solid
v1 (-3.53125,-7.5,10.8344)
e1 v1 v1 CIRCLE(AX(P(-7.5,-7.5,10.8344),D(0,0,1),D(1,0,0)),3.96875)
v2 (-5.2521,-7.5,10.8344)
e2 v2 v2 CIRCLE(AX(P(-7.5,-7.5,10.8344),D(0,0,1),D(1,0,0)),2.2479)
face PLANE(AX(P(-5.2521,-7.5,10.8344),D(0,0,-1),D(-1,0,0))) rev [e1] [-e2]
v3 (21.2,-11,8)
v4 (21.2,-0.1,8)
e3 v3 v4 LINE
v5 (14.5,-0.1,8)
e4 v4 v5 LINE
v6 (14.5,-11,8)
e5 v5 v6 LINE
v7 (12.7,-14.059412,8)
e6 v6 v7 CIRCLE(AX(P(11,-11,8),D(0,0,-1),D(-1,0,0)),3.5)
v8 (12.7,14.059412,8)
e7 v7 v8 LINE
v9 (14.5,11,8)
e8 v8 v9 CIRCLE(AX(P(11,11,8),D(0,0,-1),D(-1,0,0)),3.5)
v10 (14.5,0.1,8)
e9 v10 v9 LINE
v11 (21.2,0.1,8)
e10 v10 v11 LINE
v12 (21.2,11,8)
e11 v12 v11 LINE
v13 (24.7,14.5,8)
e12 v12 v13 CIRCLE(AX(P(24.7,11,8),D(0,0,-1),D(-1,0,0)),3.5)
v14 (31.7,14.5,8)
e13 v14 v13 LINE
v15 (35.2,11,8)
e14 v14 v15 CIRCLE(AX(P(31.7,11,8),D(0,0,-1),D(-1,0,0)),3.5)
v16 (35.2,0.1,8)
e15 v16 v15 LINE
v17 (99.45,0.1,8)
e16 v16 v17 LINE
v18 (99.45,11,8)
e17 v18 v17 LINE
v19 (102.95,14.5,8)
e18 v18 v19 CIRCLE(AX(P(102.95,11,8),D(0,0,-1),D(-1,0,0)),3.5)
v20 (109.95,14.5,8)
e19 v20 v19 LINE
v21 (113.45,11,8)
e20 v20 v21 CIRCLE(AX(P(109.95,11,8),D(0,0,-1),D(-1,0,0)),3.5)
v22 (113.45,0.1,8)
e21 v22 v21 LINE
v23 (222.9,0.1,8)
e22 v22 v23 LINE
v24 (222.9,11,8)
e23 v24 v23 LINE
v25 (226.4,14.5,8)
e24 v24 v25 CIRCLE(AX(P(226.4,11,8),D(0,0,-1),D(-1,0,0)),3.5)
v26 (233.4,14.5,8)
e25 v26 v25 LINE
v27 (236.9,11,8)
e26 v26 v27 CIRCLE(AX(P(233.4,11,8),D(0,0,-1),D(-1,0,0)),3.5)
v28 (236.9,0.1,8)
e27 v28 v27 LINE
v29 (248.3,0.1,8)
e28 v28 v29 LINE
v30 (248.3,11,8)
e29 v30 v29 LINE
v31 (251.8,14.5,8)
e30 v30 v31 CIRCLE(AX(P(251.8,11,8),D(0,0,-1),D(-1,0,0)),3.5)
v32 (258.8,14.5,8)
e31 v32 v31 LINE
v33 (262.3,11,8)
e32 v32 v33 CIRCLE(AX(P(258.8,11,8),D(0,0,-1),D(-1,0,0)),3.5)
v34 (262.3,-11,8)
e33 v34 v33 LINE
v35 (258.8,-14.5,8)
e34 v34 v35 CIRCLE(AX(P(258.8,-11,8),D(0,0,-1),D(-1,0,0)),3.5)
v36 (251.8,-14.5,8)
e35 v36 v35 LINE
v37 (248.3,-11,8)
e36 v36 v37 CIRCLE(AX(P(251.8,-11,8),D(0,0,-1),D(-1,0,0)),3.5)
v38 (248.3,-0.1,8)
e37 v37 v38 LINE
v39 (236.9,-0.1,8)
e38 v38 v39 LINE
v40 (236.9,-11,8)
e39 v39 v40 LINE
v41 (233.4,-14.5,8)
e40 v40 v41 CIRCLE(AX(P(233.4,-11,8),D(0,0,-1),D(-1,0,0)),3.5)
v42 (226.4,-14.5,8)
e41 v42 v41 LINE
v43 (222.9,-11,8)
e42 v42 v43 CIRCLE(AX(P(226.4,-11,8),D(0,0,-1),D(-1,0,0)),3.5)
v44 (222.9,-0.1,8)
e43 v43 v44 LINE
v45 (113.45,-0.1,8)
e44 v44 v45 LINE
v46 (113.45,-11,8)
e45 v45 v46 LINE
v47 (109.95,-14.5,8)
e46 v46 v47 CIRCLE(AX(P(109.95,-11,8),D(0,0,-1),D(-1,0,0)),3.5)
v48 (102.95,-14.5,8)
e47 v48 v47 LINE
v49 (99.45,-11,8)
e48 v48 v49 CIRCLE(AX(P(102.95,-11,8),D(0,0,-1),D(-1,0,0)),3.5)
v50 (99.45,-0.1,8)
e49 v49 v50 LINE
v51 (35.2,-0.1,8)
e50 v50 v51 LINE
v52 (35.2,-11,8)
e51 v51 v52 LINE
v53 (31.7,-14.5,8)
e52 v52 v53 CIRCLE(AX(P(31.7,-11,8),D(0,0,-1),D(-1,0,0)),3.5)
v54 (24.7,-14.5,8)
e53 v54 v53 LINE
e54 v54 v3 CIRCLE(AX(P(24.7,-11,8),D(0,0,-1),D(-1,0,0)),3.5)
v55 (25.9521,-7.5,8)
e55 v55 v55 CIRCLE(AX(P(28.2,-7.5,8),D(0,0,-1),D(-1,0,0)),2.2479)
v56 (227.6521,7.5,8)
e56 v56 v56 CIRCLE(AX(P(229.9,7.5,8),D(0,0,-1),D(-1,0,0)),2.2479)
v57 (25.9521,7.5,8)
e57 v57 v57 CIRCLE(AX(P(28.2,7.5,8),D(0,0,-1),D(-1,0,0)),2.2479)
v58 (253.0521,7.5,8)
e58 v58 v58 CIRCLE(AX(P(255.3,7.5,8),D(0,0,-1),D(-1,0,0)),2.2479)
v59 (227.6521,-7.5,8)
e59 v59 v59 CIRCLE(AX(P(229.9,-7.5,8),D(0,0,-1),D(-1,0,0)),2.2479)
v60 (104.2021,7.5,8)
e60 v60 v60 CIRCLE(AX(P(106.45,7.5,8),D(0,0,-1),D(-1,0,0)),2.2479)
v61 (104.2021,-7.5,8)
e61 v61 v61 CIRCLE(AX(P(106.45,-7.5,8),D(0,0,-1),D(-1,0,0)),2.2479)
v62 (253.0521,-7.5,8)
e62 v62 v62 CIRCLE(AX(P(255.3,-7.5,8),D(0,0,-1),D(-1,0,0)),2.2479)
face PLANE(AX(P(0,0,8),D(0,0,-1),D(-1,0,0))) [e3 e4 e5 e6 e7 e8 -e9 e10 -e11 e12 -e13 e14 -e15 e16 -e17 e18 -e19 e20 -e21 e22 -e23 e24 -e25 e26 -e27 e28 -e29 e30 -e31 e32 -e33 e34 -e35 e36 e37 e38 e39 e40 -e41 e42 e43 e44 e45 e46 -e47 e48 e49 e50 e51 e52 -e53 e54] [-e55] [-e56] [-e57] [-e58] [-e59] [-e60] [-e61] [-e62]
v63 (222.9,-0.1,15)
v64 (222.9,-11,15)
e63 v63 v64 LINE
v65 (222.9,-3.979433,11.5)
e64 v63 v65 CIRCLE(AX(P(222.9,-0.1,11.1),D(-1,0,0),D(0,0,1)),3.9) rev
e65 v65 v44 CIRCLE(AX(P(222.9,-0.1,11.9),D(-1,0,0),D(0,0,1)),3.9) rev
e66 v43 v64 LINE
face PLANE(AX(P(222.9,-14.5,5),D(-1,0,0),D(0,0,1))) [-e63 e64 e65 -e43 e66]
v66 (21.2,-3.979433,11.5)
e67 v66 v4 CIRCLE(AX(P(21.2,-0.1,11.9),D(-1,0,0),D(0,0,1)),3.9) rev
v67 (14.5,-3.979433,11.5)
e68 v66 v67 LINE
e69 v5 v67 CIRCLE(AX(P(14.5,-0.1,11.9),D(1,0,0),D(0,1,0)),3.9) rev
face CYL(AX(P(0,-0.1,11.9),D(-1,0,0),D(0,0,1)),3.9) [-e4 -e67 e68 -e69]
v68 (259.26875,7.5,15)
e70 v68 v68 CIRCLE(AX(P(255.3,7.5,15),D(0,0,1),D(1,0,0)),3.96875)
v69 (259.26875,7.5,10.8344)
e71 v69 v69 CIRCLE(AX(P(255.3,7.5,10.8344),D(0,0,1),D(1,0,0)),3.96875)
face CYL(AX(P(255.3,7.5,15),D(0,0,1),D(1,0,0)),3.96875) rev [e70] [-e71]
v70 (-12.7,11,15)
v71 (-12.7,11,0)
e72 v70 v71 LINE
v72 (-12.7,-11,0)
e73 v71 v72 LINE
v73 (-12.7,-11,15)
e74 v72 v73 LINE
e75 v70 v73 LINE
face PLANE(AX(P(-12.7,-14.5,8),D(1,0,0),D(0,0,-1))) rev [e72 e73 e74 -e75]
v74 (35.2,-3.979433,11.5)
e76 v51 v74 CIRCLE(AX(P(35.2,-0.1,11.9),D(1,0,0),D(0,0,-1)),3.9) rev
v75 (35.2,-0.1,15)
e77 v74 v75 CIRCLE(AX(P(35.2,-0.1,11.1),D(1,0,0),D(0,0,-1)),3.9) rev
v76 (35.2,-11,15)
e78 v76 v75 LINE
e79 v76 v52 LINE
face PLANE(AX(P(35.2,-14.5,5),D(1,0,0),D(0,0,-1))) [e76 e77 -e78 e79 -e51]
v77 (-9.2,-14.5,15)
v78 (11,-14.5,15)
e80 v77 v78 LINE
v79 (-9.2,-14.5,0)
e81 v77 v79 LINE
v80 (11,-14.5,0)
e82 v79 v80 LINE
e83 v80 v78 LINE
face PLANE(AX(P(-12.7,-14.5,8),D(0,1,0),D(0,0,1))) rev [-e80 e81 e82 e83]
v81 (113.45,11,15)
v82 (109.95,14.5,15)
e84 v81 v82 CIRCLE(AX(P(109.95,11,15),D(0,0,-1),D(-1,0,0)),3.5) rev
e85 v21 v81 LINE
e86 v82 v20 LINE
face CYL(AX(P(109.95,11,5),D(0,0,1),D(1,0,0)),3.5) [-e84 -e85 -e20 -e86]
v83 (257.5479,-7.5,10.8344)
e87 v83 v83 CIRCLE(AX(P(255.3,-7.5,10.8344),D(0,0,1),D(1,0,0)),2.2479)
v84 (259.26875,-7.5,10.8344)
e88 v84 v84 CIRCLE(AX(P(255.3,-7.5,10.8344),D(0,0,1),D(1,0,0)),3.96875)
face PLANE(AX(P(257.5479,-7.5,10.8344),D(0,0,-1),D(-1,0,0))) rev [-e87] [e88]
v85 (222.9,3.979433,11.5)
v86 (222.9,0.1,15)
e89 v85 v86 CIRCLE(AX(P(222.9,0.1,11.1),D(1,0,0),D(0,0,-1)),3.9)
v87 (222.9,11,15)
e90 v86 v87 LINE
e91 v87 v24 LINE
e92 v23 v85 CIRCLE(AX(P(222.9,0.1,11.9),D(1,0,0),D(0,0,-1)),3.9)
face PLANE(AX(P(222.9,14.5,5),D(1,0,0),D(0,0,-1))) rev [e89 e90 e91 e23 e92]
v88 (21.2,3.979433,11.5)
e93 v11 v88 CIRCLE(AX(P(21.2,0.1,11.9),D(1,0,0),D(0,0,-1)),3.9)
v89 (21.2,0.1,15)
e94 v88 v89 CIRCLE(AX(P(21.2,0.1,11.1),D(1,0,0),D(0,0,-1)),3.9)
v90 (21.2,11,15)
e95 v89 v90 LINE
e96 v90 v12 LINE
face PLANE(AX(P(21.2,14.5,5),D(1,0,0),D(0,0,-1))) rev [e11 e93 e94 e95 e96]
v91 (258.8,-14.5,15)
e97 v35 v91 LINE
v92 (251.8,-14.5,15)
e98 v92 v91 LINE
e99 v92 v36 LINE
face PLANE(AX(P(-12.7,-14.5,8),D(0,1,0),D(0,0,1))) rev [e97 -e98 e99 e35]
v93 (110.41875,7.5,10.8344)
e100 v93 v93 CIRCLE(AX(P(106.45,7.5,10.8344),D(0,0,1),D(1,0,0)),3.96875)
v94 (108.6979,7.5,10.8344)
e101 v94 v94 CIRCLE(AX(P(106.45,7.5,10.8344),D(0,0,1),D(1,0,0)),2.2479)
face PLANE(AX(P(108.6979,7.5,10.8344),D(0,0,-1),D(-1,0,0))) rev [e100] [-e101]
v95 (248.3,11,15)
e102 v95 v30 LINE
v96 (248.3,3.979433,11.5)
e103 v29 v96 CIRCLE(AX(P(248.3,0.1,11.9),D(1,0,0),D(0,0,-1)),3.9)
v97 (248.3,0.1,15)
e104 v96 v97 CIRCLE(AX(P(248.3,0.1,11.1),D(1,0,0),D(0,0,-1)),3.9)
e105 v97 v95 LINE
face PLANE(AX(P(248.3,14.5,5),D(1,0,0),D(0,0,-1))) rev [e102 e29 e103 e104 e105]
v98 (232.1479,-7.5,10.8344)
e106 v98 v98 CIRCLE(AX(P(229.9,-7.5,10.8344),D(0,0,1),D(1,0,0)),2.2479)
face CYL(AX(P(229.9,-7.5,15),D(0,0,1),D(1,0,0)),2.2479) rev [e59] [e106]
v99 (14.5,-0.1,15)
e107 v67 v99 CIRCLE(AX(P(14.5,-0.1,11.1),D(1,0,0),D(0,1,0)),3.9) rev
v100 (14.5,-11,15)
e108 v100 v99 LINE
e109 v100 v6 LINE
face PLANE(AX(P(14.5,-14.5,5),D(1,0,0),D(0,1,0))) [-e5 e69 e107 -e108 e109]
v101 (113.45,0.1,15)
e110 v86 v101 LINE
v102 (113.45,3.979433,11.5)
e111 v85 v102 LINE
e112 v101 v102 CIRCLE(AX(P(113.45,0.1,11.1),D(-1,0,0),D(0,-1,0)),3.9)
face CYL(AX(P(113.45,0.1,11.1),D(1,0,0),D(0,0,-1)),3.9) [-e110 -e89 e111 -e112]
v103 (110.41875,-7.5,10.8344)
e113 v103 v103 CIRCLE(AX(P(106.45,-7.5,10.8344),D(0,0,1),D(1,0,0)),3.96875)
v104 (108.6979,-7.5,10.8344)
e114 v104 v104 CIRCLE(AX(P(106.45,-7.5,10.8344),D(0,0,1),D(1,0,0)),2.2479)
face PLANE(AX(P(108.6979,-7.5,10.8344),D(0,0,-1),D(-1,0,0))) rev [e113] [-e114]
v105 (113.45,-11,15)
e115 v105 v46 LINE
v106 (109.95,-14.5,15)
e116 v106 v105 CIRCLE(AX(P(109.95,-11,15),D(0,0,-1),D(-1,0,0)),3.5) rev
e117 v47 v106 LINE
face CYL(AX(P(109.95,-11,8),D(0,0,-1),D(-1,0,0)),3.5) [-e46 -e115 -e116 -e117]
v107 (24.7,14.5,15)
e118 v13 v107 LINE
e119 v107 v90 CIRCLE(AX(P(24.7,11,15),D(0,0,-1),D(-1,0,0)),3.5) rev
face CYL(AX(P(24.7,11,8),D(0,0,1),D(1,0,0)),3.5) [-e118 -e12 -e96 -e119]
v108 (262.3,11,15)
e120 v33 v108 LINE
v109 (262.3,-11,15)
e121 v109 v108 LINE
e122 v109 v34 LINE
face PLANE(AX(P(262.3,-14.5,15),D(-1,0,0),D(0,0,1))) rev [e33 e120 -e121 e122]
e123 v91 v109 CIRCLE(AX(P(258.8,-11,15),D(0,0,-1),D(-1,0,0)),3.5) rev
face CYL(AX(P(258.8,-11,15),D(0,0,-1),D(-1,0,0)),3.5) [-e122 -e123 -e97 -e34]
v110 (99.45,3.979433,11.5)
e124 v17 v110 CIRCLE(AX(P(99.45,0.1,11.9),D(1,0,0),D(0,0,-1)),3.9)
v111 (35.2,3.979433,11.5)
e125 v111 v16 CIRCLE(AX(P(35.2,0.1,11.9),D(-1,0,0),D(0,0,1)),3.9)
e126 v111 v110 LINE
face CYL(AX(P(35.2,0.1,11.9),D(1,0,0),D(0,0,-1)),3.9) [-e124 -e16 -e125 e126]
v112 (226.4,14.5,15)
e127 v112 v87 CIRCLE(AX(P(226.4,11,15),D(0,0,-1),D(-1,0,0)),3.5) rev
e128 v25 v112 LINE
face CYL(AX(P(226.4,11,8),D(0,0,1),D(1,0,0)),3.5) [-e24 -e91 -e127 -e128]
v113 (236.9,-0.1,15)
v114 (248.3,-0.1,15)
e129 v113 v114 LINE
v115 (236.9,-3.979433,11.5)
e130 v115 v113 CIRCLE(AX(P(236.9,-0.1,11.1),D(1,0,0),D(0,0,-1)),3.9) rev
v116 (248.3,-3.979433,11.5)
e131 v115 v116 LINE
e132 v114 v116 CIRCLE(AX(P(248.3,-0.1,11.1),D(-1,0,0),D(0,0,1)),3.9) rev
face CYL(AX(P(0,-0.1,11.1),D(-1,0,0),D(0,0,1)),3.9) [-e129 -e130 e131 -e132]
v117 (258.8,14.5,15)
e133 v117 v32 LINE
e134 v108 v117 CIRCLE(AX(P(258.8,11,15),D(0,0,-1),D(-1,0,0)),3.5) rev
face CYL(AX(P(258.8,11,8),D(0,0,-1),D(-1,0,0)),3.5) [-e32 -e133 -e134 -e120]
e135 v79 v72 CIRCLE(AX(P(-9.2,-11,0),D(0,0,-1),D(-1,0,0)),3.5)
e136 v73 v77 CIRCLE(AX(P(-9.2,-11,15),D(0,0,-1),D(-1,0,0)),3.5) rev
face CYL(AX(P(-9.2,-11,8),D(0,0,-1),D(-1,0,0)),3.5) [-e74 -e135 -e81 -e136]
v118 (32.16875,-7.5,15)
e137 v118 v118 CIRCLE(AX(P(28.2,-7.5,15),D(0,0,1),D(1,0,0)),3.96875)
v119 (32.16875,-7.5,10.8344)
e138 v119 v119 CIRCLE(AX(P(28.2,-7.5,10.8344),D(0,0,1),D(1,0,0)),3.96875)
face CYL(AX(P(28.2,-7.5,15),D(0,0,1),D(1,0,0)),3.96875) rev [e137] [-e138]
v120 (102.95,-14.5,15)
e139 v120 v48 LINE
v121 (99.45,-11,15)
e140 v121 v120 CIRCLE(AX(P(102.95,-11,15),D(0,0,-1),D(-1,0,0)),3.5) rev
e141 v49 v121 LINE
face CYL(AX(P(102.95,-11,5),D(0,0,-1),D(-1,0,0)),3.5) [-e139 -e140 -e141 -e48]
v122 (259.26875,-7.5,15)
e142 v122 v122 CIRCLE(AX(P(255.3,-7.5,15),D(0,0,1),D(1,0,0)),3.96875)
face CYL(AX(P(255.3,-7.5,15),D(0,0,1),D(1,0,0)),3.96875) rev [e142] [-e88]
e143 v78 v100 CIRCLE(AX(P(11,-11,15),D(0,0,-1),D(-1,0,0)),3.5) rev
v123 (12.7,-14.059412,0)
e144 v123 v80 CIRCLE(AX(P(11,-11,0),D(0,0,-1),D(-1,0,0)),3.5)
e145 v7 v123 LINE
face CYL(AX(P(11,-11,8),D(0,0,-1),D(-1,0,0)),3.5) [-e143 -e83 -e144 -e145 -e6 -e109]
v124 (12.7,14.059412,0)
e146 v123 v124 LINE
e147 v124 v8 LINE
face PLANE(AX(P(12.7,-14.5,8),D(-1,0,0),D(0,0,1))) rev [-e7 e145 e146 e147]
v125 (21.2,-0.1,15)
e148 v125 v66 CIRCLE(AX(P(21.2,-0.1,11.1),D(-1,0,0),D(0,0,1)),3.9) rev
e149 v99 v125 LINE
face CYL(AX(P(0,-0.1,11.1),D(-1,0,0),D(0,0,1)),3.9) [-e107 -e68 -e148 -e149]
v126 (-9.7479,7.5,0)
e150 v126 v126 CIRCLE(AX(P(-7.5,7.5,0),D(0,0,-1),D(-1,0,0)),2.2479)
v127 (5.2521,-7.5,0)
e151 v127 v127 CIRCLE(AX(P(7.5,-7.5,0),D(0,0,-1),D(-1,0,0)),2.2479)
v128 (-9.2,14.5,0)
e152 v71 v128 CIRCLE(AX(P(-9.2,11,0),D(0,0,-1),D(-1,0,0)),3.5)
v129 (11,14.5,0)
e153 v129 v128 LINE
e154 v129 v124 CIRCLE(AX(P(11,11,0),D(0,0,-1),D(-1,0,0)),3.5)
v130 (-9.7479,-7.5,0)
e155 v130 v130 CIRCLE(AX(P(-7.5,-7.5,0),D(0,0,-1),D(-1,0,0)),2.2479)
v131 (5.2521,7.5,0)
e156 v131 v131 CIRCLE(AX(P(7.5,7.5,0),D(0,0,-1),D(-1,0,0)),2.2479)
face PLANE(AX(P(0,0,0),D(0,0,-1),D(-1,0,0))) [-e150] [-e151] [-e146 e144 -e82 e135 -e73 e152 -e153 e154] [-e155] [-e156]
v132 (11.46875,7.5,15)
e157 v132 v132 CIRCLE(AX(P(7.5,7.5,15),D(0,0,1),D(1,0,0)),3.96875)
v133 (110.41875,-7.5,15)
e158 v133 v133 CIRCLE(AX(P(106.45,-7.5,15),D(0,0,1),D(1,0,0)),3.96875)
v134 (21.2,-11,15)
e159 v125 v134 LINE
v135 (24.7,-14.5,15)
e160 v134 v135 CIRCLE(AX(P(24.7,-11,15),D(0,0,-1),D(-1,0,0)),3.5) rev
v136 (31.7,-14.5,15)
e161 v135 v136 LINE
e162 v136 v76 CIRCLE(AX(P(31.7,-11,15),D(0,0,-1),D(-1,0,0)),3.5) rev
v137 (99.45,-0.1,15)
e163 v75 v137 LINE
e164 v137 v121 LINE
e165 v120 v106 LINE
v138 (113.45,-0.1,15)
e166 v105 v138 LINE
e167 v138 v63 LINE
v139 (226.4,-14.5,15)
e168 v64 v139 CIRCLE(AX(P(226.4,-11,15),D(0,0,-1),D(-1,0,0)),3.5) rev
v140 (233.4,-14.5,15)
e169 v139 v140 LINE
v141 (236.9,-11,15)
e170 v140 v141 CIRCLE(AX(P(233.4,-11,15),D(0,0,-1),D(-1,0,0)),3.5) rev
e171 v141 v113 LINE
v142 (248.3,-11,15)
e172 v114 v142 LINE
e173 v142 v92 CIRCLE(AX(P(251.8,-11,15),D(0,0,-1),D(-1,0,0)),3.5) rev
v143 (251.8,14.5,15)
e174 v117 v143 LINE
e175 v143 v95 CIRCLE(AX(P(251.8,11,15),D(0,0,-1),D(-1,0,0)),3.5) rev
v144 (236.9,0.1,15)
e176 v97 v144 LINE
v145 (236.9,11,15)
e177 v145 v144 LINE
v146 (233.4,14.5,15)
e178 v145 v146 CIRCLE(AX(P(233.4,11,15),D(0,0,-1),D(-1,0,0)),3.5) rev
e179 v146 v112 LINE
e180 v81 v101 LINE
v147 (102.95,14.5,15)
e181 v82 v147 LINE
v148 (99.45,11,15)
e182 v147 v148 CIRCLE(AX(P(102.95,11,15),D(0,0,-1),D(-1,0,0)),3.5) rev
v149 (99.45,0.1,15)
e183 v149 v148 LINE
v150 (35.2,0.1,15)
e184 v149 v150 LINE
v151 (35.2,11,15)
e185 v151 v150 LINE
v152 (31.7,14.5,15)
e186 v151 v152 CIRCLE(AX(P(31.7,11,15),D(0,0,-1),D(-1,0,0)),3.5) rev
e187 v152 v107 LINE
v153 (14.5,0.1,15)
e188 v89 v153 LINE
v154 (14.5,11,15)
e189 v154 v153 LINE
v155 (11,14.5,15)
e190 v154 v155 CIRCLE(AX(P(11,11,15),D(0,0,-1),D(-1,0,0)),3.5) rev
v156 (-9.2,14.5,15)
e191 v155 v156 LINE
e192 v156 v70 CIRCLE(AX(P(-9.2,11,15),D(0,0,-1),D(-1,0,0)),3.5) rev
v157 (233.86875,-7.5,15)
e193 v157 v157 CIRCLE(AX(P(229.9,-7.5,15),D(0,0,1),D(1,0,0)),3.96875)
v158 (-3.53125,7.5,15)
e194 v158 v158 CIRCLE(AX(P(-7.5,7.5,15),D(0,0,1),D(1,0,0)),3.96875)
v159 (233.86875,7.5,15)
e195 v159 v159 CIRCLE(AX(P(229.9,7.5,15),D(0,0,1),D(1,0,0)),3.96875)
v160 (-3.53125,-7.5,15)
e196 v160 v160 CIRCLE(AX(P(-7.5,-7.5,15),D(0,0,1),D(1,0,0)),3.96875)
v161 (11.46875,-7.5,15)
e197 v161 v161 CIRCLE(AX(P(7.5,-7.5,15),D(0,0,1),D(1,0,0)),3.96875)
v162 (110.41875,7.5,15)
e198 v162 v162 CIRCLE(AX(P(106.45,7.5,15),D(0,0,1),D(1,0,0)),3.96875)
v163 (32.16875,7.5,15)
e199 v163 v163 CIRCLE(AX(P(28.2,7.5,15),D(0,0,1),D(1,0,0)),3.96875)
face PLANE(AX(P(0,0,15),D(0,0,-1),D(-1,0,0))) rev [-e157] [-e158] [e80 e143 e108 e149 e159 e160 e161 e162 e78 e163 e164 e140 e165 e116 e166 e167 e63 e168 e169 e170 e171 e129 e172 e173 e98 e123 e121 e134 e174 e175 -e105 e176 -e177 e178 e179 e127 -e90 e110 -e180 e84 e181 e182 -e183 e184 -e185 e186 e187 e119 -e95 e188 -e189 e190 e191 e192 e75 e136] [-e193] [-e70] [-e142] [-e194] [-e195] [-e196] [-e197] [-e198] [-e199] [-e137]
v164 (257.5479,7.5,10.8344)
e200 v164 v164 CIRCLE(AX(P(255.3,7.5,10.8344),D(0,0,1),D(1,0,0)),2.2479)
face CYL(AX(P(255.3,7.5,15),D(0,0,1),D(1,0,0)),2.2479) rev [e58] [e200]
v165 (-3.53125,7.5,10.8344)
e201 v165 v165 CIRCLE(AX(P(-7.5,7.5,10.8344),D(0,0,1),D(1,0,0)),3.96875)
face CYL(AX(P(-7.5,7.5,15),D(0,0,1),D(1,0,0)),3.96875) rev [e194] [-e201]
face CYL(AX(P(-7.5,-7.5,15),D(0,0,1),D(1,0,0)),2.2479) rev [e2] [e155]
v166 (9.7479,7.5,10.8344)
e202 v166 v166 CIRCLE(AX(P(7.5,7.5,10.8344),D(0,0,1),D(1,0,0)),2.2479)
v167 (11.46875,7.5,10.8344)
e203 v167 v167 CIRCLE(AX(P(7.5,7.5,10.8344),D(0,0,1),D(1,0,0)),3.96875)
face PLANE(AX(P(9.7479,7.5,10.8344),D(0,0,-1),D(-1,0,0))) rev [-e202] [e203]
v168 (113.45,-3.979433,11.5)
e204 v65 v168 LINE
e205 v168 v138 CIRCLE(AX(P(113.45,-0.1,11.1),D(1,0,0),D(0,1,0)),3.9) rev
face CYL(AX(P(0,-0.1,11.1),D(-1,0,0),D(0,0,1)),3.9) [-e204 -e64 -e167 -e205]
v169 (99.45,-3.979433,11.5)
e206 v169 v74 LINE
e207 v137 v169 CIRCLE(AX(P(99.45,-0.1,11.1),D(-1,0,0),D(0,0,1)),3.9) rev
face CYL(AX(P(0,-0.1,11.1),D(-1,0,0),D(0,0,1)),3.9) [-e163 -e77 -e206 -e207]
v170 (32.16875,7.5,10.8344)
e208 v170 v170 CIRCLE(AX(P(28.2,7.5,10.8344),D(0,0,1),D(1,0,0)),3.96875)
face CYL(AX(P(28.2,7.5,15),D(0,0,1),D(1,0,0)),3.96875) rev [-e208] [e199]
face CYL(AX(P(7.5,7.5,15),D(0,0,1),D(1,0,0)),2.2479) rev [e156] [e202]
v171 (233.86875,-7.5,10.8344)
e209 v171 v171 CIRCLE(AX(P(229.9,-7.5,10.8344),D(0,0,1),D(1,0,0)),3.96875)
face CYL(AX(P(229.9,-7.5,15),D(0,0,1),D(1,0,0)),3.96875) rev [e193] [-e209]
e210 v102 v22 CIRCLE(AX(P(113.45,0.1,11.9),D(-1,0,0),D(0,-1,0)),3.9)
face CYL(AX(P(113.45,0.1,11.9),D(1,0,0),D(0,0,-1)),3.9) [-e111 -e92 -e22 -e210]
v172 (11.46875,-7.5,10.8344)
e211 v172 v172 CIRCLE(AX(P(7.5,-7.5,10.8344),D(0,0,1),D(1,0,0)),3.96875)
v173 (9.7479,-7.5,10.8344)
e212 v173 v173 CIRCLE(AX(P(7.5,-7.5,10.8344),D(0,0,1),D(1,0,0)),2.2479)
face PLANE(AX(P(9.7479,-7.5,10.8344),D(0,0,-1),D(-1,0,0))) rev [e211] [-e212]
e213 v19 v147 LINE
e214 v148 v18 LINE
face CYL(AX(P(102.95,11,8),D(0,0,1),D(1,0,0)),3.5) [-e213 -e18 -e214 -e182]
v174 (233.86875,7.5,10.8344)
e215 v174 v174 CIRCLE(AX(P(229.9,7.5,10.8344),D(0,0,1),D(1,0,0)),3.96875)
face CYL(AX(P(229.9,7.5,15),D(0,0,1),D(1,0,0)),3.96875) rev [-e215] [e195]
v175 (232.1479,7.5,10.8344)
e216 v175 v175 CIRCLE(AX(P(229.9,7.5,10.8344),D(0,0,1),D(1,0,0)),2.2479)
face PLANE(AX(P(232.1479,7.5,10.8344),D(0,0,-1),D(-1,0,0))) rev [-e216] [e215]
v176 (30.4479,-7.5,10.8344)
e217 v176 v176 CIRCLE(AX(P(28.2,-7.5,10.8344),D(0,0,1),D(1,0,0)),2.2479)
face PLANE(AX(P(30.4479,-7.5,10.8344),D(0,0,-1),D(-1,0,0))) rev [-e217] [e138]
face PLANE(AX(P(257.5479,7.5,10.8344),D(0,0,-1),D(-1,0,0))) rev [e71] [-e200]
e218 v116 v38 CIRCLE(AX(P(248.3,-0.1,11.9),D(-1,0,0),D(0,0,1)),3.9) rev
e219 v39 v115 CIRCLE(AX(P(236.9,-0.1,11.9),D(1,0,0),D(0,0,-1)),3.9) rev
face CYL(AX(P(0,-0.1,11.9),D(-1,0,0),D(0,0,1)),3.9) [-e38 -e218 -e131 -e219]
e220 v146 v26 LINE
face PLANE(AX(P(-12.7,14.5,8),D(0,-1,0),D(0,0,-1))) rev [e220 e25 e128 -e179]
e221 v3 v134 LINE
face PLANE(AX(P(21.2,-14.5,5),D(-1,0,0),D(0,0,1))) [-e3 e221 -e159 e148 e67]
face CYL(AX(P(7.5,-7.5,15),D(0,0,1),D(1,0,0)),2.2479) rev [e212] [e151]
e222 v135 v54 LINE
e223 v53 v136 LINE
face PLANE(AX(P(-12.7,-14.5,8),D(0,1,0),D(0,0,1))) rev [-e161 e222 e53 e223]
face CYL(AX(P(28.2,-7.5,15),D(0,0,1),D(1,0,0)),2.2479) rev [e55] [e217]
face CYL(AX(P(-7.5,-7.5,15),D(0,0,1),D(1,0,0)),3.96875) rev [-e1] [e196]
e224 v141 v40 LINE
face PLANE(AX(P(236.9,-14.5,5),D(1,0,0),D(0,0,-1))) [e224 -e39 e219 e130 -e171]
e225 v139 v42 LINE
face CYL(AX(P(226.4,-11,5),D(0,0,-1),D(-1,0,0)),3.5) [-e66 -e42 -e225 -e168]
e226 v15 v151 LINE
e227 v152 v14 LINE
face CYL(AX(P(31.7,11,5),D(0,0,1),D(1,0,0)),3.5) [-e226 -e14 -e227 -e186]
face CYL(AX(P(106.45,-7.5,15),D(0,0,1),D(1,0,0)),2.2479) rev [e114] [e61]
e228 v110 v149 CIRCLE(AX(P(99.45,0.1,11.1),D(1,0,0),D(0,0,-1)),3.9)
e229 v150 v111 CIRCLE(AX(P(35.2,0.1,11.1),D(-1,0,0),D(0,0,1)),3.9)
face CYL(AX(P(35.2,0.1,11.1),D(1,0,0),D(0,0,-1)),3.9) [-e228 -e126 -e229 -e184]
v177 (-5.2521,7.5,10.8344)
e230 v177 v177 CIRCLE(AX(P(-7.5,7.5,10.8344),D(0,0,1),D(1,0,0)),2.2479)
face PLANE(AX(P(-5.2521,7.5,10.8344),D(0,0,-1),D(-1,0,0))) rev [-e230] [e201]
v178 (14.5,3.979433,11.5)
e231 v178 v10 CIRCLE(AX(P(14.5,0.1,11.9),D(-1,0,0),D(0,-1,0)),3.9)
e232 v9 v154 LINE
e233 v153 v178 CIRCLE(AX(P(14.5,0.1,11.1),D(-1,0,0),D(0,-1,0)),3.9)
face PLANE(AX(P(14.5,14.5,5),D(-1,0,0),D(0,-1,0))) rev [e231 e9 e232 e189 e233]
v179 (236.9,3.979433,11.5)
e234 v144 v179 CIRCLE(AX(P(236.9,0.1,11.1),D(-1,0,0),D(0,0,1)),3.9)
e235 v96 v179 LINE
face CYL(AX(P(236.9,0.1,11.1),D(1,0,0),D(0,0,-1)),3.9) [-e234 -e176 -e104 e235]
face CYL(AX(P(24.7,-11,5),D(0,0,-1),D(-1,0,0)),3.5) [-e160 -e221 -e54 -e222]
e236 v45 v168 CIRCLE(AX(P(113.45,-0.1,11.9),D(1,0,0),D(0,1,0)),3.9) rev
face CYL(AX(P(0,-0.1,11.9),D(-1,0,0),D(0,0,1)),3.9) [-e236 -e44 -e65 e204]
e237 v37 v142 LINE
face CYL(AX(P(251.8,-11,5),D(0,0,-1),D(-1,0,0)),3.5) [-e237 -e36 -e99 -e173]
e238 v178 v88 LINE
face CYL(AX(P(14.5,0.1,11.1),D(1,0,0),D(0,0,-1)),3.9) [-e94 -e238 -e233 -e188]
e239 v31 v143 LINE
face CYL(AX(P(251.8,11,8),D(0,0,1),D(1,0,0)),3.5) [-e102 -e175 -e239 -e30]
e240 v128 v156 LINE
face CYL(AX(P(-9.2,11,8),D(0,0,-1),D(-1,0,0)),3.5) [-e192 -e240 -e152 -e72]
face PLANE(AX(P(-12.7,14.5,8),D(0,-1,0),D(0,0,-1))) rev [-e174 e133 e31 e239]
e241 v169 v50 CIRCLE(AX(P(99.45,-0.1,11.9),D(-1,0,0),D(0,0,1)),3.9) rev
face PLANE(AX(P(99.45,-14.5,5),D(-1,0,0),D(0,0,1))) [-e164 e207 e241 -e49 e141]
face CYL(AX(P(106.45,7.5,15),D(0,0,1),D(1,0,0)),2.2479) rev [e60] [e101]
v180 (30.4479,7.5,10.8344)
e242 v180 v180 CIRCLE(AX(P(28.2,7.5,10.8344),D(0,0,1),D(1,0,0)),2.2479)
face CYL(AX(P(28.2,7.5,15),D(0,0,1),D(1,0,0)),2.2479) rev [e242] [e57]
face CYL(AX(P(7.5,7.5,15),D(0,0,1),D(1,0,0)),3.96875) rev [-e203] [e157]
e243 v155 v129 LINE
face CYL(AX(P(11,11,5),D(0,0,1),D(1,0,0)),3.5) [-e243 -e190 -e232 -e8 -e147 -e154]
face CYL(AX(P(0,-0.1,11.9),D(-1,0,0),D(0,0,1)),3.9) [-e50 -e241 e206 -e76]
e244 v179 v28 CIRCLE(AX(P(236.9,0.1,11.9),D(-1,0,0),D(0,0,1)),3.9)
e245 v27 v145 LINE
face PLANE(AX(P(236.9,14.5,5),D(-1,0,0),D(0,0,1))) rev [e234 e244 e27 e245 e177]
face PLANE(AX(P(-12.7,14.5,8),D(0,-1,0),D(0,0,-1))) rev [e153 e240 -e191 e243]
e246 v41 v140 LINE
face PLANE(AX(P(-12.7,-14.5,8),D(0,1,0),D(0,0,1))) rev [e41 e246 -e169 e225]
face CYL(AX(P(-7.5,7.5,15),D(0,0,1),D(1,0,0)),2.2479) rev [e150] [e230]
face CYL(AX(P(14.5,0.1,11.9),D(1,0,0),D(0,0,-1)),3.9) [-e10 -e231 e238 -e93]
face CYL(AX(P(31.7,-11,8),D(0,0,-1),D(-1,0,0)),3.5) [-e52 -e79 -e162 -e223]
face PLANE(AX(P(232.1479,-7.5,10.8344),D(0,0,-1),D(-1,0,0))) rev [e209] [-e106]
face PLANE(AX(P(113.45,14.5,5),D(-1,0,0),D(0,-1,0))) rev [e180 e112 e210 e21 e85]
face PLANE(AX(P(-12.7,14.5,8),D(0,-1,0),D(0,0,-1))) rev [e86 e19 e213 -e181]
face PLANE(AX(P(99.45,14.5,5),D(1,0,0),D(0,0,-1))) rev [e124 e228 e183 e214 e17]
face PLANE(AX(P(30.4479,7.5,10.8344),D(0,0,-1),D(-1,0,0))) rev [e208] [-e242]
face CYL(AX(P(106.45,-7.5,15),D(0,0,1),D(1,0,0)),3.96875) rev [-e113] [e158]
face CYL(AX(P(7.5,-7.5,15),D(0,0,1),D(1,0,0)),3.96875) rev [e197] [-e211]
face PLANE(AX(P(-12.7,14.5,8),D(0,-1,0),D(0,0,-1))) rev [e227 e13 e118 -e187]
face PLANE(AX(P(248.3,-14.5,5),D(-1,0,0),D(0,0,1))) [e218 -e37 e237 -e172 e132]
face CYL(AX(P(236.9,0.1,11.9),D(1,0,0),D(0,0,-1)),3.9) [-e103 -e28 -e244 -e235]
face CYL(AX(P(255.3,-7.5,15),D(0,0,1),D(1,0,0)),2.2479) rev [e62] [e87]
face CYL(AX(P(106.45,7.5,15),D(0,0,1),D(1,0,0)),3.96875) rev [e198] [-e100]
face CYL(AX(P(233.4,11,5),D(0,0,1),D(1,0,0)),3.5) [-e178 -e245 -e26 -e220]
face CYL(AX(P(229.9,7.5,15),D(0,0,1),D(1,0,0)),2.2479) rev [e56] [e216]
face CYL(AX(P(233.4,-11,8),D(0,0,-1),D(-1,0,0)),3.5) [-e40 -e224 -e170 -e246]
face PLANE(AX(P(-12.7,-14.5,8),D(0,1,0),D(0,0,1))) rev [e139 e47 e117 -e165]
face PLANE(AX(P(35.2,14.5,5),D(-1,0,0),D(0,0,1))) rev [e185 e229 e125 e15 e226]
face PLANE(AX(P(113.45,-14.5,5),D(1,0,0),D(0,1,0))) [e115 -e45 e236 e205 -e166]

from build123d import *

# Parameters (mm, degrees)
SKETCH1_W                                      = 25.4
SKETCH1_H                                      = 29
BOSS_EXTRUDE1_DEPTH                            = 8
SKETCH2_W                                      = 275
SKETCH2_H                                      = 29
BOSS_EXTRUDE2_DEPTH                            = 7
CBORE_FOR_8_SOCKET_HEAD_CAP_SCREW1_D           = 4.4958
CBORE_FOR_8_SOCKET_HEAD_CAP_SCREW1_DEPTH       = 18.649325414
CBORE_FOR_8_SOCKET_HEAD_CAP_SCREW1_CBORE_D     = 7.9375
CBORE_FOR_8_SOCKET_HEAD_CAP_SCREW1_CBORE_DEPTH = 4.1656
CBORE_FOR_8_SOCKET_HEAD_CAP_SCREW1_TIP         = 1.350674586
SKETCH5_W                                      = 64.25
SKETCH5_H                                      = 10.5
SKETCH5_W_2                                    = 109.45
SKETCH5_W_3                                    = 11.4
SKETCH5_W_4                                    = 6.7
CUT_EXTRUDE1_DEPTH                             = 10
FILLET1_R                                      = 3.9
FILLET2_R                                      = 3.5


with BuildPart() as part:
    # Sketch1 → Boss-Extrude1 (new body)
    with BuildSketch(Plane.XY):
        Rectangle(SKETCH1_W, SKETCH1_H)
    extrude(amount=BOSS_EXTRUDE1_DEPTH)

    # Sketch2 → Boss-Extrude2 (add)
    with BuildSketch(Plane.XY.offset(8)):
        with Locations((124.8, 0)):
            Rectangle(SKETCH2_W, SKETCH2_H)
    extrude(amount=BOSS_EXTRUDE2_DEPTH)

    # CBORE for #8 Socket Head Cap Screw1
    with Locations(Plane(origin=(-7.5, 7.5, 15), x_dir=(1, 0, 0), z_dir=(0, 0, 1))):
        with Locations((0, 0), (15, 0), (15, -15), (0, -15), (35.7, 0), (35.7, -15), (113.95, 0), (113.95, -15), (237.4, 0), (237.4, -15), (262.8, 0), (262.8, -15)):
            CounterBoreHole(CBORE_FOR_8_SOCKET_HEAD_CAP_SCREW1_D / 2, CBORE_FOR_8_SOCKET_HEAD_CAP_SCREW1_CBORE_D / 2, CBORE_FOR_8_SOCKET_HEAD_CAP_SCREW1_CBORE_DEPTH, depth=CBORE_FOR_8_SOCKET_HEAD_CAP_SCREW1_DEPTH)
            with Locations((0, 0, -(CBORE_FOR_8_SOCKET_HEAD_CAP_SCREW1_DEPTH + CBORE_FOR_8_SOCKET_HEAD_CAP_SCREW1_TIP / 2))):  # 118° drill point
                Cone(0, CBORE_FOR_8_SOCKET_HEAD_CAP_SCREW1_D / 2, CBORE_FOR_8_SOCKET_HEAD_CAP_SCREW1_TIP, mode=Mode.SUBTRACT)

    # Sketch5 → Cut-Extrude1 (cut)
    with BuildSketch(Plane.XY.offset(15)):
        with Locations((67.325, 9.25)):
            Rectangle(SKETCH5_W, SKETCH5_H)
        with Locations((168.175, 9.25)):
            Rectangle(SKETCH5_W_2, SKETCH5_H)
        with Locations((242.6, 9.25)):
            Rectangle(SKETCH5_W_3, SKETCH5_H)
        with Locations((17.85, 9.25)):
            Rectangle(SKETCH5_W_4, SKETCH5_H)
    cut_extrude1 = extrude(amount=-CUT_EXTRUDE1_DEPTH, mode=Mode.SUBTRACT)

    # Mirror1: Cut-Extrude1 across plane
    add(cut_extrude1.mirror(Plane.ZX), mode=Mode.SUBTRACT)

    # Fillet1
    # the kernel refuses this fillet: 3.9 mm, written as the material it takes off along each edge
    with BuildSketch(Plane(origin=(222.9, 4, 15), x_dir=(0, -1, 0), z_dir=(-1, 0, 0)), Plane(origin=(222.9, -4, 8), x_dir=(0, 1, 0), z_dir=(-1, 0, 0))) as fillet1_piece_1:
        with BuildLine():
            CenterArc((FILLET1_R, -FILLET1_R), FILLET1_R, 90, 90)
            Line((0, -FILLET1_R), (0, 0))
            Line((0, 0), (FILLET1_R, 0))
        make_face()
    extrude(amount=109.45, mode=Mode.SUBTRACT)
    with BuildSketch(Plane(origin=(248.3, 4, 15), x_dir=(0, -1, 0), z_dir=(-1, 0, 0)), Plane(origin=(248.3, -4, 8), x_dir=(0, 1, 0), z_dir=(-1, 0, 0))) as fillet1_piece_2:
        with BuildLine():
            CenterArc((FILLET1_R, -FILLET1_R), FILLET1_R, 90, 90)
            Line((0, -FILLET1_R), (0, 0))
            Line((0, 0), (FILLET1_R, 0))
        make_face()
    extrude(amount=11.4, mode=Mode.SUBTRACT)
    with BuildSketch(Plane(origin=(248.3, 4, 8), x_dir=(0, -1, 0), z_dir=(-1, 0, 0)), Plane(origin=(248.3, -4, 15), x_dir=(0, 1, 0), z_dir=(-1, 0, 0))) as fillet1_piece_3:
        with BuildLine():
            CenterArc((FILLET1_R, FILLET1_R), FILLET1_R, 180, 90)
            Line((0, FILLET1_R), (0, 0))
            Line((0, 0), (FILLET1_R, 0))
        make_face()
    extrude(amount=11.4, mode=Mode.SUBTRACT)
    with BuildSketch(Plane(origin=(222.9, -4, 15), x_dir=(0, 1, 0), z_dir=(-1, 0, 0)), Plane(origin=(222.9, 4, 8), x_dir=(0, -1, 0), z_dir=(-1, 0, 0))) as fillet1_piece_4:
        with BuildLine():
            CenterArc((FILLET1_R, FILLET1_R), FILLET1_R, 180, 90)
            Line((0, FILLET1_R), (0, 0))
            Line((0, 0), (FILLET1_R, 0))
        make_face()
    extrude(amount=109.45, mode=Mode.SUBTRACT)
    with BuildSketch(Plane(origin=(99.45, 4, 8), x_dir=(0, -1, 0), z_dir=(-1, 0, 0)), Plane(origin=(99.45, -4, 15), x_dir=(0, 1, 0), z_dir=(-1, 0, 0))) as fillet1_piece_5:
        with BuildLine():
            CenterArc((FILLET1_R, FILLET1_R), FILLET1_R, 180, 90)
            Line((0, FILLET1_R), (0, 0))
            Line((0, 0), (FILLET1_R, 0))
        make_face()
    extrude(amount=64.25, mode=Mode.SUBTRACT)
    with BuildSketch(Plane(origin=(99.45, 4, 15), x_dir=(0, -1, 0), z_dir=(-1, 0, 0)), Plane(origin=(99.45, -4, 8), x_dir=(0, 1, 0), z_dir=(-1, 0, 0))) as fillet1_piece_6:
        with BuildLine():
            CenterArc((FILLET1_R, -FILLET1_R), FILLET1_R, 90, 90)
            Line((0, -FILLET1_R), (0, 0))
            Line((0, 0), (FILLET1_R, 0))
        make_face()
    extrude(amount=64.25, mode=Mode.SUBTRACT)
    with BuildSketch(Plane(origin=(21.2, -4, 8), x_dir=(0, 1, 0), z_dir=(-1, 0, 0)), Plane(origin=(21.2, 4, 15), x_dir=(0, -1, 0), z_dir=(-1, 0, 0))) as fillet1_piece_7:
        with BuildLine():
            CenterArc((FILLET1_R, -FILLET1_R), FILLET1_R, 90, 90)
            Line((0, -FILLET1_R), (0, 0))
            Line((0, 0), (FILLET1_R, 0))
        make_face()
    extrude(amount=6.7, mode=Mode.SUBTRACT)
    with BuildSketch(Plane(origin=(21.2, -4, 15), x_dir=(0, 1, 0), z_dir=(-1, 0, 0)), Plane(origin=(21.2, 4, 8), x_dir=(0, -1, 0), z_dir=(-1, 0, 0))) as fillet1_piece_8:
        with BuildLine():
            CenterArc((FILLET1_R, FILLET1_R), FILLET1_R, 180, 90)
            Line((0, FILLET1_R), (0, 0))
            Line((0, 0), (FILLET1_R, 0))
        make_face()
    extrude(amount=6.7, mode=Mode.SUBTRACT)

    # Fillet2
    fillet2_edges = [part.edges().sort_by_distance(p)[0] for p in [
        (262.3, -14.5, 11.5),
        (14.5, 14.5, 11.5),
        (21.2, 14.5, 11.5),
        (262.3, 14.5, 11.5),
        (236.9, 14.5, 11.5),
        (248.3, 14.5, 11.5),
        (113.45, 14.5, 11.5),
        (222.9, 14.5, 11.5),
        (35.2, 14.5, 11.5),
        (99.45, 14.5, 11.5),
        (14.5, -14.5, 11.5),
        (21.2, -14.5, 11.5),
        (236.9, -14.5, 11.5),
        (248.3, -14.5, 11.5),
        (113.45, -14.5, 11.5),
        (222.9, -14.5, 11.5),
        (35.2, -14.5, 11.5),
        (99.45, -14.5, 11.5),
        (-12.7, -14.5, 7.5),
        (-12.7, 14.5, 7.5),
    ]]
    fillet(fillet2_edges, radius=FILLET2_R)


solid = part.part
